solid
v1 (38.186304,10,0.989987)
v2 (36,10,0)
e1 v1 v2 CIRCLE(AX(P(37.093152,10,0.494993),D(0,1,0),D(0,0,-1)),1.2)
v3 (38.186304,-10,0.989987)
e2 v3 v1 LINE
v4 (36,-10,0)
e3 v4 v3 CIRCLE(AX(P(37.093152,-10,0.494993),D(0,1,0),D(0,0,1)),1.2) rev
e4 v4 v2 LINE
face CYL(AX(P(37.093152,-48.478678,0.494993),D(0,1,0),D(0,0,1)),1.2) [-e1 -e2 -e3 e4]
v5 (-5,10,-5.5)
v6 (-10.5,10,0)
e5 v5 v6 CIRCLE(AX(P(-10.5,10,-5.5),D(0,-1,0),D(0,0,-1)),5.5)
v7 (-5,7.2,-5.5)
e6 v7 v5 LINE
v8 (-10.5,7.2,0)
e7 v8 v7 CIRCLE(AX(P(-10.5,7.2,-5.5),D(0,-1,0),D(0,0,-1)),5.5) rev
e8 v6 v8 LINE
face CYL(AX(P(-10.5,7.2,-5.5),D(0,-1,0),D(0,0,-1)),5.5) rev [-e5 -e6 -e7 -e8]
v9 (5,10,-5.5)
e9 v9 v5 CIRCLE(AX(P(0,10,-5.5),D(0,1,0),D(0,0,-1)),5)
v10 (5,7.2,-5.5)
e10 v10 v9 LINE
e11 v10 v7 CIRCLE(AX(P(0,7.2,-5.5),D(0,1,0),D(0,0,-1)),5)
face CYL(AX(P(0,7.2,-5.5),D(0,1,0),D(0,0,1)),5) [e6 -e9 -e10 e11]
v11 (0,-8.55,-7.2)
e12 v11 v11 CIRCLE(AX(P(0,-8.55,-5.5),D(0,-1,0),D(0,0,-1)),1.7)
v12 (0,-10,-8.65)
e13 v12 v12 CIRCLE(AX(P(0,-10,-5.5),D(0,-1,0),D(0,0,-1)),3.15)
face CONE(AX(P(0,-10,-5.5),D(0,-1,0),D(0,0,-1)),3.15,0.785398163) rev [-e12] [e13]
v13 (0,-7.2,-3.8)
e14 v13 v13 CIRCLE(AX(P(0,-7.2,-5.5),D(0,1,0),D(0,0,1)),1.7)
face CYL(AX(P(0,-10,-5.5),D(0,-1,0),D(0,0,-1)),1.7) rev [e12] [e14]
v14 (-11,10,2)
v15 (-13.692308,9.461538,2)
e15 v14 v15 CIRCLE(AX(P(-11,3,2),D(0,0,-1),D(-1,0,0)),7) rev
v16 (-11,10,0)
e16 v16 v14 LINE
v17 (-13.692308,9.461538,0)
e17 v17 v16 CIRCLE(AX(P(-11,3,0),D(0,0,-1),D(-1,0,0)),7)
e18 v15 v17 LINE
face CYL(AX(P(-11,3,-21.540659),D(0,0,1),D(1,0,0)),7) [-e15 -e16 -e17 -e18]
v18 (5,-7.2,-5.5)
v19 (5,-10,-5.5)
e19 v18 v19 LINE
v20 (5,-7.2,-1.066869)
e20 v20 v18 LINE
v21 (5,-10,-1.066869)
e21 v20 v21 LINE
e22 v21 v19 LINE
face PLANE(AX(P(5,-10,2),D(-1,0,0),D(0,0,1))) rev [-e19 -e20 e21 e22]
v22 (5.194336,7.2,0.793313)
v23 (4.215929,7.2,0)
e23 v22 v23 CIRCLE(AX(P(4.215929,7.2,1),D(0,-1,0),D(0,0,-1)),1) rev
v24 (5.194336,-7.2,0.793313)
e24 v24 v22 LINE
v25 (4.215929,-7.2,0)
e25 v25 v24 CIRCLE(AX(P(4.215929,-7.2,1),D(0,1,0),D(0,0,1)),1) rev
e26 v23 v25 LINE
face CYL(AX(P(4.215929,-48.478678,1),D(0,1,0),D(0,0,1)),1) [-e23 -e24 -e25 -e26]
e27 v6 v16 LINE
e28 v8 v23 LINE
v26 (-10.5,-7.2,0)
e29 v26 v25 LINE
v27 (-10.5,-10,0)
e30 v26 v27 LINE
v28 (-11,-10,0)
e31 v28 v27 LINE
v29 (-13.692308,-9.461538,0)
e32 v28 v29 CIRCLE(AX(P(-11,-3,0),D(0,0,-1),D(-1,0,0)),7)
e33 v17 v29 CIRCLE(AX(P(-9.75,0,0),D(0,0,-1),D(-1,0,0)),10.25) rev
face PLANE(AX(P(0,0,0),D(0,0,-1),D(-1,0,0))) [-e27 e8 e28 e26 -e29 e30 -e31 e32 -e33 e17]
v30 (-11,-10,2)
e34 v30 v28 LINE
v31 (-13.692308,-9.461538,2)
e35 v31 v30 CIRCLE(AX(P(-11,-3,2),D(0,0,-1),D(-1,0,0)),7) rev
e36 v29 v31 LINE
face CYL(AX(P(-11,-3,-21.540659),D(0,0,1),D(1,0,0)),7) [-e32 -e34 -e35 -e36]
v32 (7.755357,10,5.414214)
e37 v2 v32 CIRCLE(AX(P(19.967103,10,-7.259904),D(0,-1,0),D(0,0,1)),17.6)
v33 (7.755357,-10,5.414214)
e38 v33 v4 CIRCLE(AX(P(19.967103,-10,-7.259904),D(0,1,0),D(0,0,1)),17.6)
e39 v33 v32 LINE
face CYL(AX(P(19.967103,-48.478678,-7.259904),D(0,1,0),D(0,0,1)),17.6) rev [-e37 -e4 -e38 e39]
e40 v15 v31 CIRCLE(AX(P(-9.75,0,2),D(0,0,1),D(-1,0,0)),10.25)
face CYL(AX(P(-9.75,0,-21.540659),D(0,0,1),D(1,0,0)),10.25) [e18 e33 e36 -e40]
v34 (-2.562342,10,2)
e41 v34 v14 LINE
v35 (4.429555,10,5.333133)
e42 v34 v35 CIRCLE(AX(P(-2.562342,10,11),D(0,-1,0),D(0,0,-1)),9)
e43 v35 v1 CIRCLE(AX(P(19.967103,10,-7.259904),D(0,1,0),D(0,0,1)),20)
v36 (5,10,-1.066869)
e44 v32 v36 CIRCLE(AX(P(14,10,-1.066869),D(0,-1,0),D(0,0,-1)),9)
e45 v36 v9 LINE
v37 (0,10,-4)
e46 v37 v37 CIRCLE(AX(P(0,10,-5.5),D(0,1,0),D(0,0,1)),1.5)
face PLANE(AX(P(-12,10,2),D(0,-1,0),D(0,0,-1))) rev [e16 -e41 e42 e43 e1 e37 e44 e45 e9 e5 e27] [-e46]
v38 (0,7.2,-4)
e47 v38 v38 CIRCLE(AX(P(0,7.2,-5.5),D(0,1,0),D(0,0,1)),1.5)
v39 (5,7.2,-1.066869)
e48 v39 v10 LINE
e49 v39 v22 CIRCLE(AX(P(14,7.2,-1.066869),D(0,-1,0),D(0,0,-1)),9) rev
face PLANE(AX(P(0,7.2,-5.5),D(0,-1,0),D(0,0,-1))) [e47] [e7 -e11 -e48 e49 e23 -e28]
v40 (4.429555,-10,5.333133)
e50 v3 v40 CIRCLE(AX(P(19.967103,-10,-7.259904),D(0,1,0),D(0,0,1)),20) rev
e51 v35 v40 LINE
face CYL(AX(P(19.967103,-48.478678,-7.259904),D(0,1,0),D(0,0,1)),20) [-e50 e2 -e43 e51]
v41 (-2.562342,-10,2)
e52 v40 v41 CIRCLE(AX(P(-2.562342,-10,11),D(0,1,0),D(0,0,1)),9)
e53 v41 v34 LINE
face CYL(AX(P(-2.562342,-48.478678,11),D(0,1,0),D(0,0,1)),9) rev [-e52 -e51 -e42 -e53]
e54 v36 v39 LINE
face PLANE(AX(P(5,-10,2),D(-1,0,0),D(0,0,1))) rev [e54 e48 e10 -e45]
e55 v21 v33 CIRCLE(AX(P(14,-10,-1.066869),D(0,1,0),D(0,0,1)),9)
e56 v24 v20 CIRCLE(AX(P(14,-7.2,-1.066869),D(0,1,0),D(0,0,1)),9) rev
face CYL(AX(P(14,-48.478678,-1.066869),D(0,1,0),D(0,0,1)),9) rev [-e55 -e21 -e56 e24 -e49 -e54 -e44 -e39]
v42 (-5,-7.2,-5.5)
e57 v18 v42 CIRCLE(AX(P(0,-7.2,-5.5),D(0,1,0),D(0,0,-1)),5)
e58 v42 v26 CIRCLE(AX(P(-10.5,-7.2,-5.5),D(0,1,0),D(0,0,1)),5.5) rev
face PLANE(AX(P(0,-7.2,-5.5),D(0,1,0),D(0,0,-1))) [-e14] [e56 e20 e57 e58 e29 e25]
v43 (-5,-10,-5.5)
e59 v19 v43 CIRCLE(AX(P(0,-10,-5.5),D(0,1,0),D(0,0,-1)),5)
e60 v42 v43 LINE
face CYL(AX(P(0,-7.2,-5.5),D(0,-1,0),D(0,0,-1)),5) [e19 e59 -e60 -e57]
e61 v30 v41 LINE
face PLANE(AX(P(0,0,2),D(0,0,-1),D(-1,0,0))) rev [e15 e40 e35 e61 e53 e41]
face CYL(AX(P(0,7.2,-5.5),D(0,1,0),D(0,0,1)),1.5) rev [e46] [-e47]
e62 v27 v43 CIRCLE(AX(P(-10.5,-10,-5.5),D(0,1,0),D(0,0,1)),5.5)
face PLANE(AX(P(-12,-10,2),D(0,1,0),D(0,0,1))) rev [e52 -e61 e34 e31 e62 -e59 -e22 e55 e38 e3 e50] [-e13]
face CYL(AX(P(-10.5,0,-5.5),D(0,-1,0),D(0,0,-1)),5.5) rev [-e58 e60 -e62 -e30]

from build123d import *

# Parameters (mm, degrees)
SKETCH1_W                                           = 17
SKETCH1_H                                           = 20
BOSS_EXTRUDE1_DEPTH                                 = 2
SKETCH2_R                                           = 1.5
BOSS_EXTRUDE2_DEPTH                                 = 2.8
FILLET1_R                                           = 5.5
FILLET1_OF_MIRROR1_R                                = 5.5
CSK_FOR_M3_COUNTERSUNK_FLAT_HEAD_SCREW1_D           = 3.4
CSK_FOR_M3_COUNTERSUNK_FLAT_HEAD_SCREW1_DEPTH       = 7
CSK_FOR_M3_COUNTERSUNK_FLAT_HEAD_SCREW1_CSINK_D     = 6.3
CSK_FOR_M3_COUNTERSUNK_FLAT_HEAD_SCREW1_CSINK_ANGLE = 90
CSK_FOR_M3_COUNTERSUNK_FLAT_HEAD_SCREW1_TIP         = 1.021463052
BOSS_EXTRUDE3_DEPTH                                 = 2
FILLET2_R                                           = 7
BOSS_EXTRUDE4_DEPTH                                 = 20
FILLET3_R                                           = 9
FILLET4_R                                           = 9
FILLET5_R                                           = 1


# Some blends are built 0.0001 mm under size
with BuildPart() as part:
    # Sketch1 → Boss-Extrude1 (new body)
    with BuildSketch(Plane.XY):
        with Locations((-3.5, 0)):
            Rectangle(SKETCH1_W, SKETCH1_H)
    extrude(amount=BOSS_EXTRUDE1_DEPTH)

    # Sketch2 → Boss-Extrude2 (add)
    with BuildSketch(Plane(origin=(0, 10, 0), x_dir=(1, 0, 0), z_dir=(0, 1, 0))):
        with BuildLine():
            Line((5, 0), (-5, 0))
            Line((-5, 0), (-5, 5.5))
            ThreePointArc((-5, 5.5), (0, 10.5), (5, 5.5))
            Line((5, 5.5), (5, 0))
        make_face()
        with Locations(Location((0, 5.5, 0), (0, 0, 270))):
            Circle(SKETCH2_R, mode=Mode.SUBTRACT)
    boss_extrude2 = extrude(amount=-BOSS_EXTRUDE2_DEPTH)

    # Fillet1
    fillet1_edges = [part.edges().sort_by_distance(p)[0] for p in [
        (-5, 8.6, 0),
    ]]
    fillet(fillet1_edges, radius=FILLET1_R - 0.0001)  # a hair under: the kernel refuses the full size

    # Mirror1: Boss-Extrude2 across plane
    add(boss_extrude2.mirror(Plane.ZX))

    # Fillet1 of Mirror1
    fillet1_of_mirror1_edges = [part.edges().sort_by_distance(p)[0] for p in [
        (-5, -8.6, 0),
    ]]
    fillet(fillet1_of_mirror1_edges, radius=FILLET1_OF_MIRROR1_R - 0.0001)  # a hair under: the kernel refuses the full size

    # CSK for M3 Countersunk Flat Head Screw1
    with Locations(Plane(origin=(0, -10, 0), x_dir=(-1, 0, 0), z_dir=(0, -1, 0))):
        with Locations((0, 5.5)):
            CounterSinkHole(CSK_FOR_M3_COUNTERSUNK_FLAT_HEAD_SCREW1_D / 2, CSK_FOR_M3_COUNTERSUNK_FLAT_HEAD_SCREW1_CSINK_D / 2, depth=CSK_FOR_M3_COUNTERSUNK_FLAT_HEAD_SCREW1_DEPTH, counter_sink_angle=CSK_FOR_M3_COUNTERSUNK_FLAT_HEAD_SCREW1_CSINK_ANGLE)
            with Locations((0, 0, -(CSK_FOR_M3_COUNTERSUNK_FLAT_HEAD_SCREW1_DEPTH + CSK_FOR_M3_COUNTERSUNK_FLAT_HEAD_SCREW1_TIP / 2))):  # 118° drill point
                Cone(0, CSK_FOR_M3_COUNTERSUNK_FLAT_HEAD_SCREW1_D / 2, CSK_FOR_M3_COUNTERSUNK_FLAT_HEAD_SCREW1_TIP, mode=Mode.SUBTRACT)

    # Sketch5 → Boss-Extrude3 (add)
    with BuildSketch(Plane.XY.offset(2)):
        with BuildLine():
            Line((-12, 10), (-12, -10))
            ThreePointArc((-12, -10), (-20, 0), (-12, 10))
        make_face()
    extrude(amount=-BOSS_EXTRUDE3_DEPTH)

    # Fillet2
    fillet2_edges = [part.edges().sort_by_distance(p)[0] for p in [
        (-12, -10, 1),
        (-12, 10, 1),
    ]]
    fillet(fillet2_edges, radius=FILLET2_R)

    # Sketch6 → Boss-Extrude4 (add)
    with BuildSketch(Plane(origin=(0, 10, 0), x_dir=(1, 0, 0), z_dir=(0, 1, 0))):
        with BuildLine():
            Line((2.239887411, -2), (4.367153275, -0.888811472))
            ThreePointArc((4.367153275, -0.888811472), (20.461428056, -10.333152259), (36, 0))
            ThreePointArc((36, 0), (37.588145554, 0.59815859), (38.186304144, -0.989986964))
            ThreePointArc((38.186304144, -0.989986964), (20.528836027, -12.73220544), (2.239887411, -2))
        make_face()
    extrude(amount=-BOSS_EXTRUDE4_DEPTH)

    # Fillet3
    # the kernel refuses this fillet: 9 mm, written as the material it adds along each edge
    with BuildSketch(Plane(origin=(5, -10, 2), x_dir=(0, 0, -1), z_dir=(0, 1, 0))) as fillet3_piece_1_section:
        with BuildLine():
            CenterArc((3.066869404, -9), FILLET3_R, 90, 46.064417531)
            ThreePointArc((-3.414213733, -2.755357386), (-1.793300325, -1.270874802), (0, 0))
            Line((0, 0), (3.066869404, 0))
        make_face()
    fillet3_piece_1 = extrude(amount=20, mode=Mode.PRIVATE)
    fillet3_piece_1 = split(fillet3_piece_1, bisect_by=Plane(origin=(4.921450274, -8.6, 0), z_dir=(0, 0, -1)), keep=Keep.TOP, mode=Mode.PRIVATE)
    fillet3_piece_1 = split(fillet3_piece_1, bisect_by=Plane(origin=(4.921450274, -7.2, -0.505403298), z_dir=(0, -1, 0)), keep=Keep.TOP, mode=Mode.PRIVATE)
    add(fillet3_piece_1)
    with BuildSketch(Plane(origin=(5, -10, 2), x_dir=(0, 0, -1), z_dir=(0, 1, 0))) as fillet3_piece_2_section:
        with BuildLine():
            CenterArc((3.066869404, -9), FILLET3_R, 90, 46.064417531)
            ThreePointArc((-3.414213733, -2.755357386), (-1.793300325, -1.270874802), (0, 0))
            Line((0, 0), (3.066869404, 0))
        make_face()
    fillet3_piece_2 = extrude(amount=20, mode=Mode.PRIVATE)
    fillet3_piece_2 = split(fillet3_piece_2, bisect_by=Plane(origin=(5.669505966, -8.6, 0), z_dir=(0, 0, 1)), keep=Keep.TOP, mode=Mode.PRIVATE)
    fillet3_piece_2 = split(fillet3_piece_2, bisect_by=Plane(origin=(5.669505966, -7.2, 2.571944176), z_dir=(0, -1, 0)), keep=Keep.TOP, mode=Mode.PRIVATE)
    add(fillet3_piece_2)
    with BuildSketch(Plane(origin=(5, -10, 2), x_dir=(0, 0, -1), z_dir=(0, 1, 0))) as fillet3_piece_3_section:
        with BuildLine():
            CenterArc((3.066869404, -9), FILLET3_R, 90, 46.064417531)
            ThreePointArc((-3.414213733, -2.755357386), (-1.793300325, -1.270874802), (0, 0))
            Line((0, 0), (3.066869404, 0))
        make_face()
    fillet3_piece_3 = extrude(amount=20, mode=Mode.PRIVATE)
    fillet3_piece_3 = split(fillet3_piece_3, bisect_by=Plane(origin=(5.669505966, 0, 0), z_dir=(0, 0, 1)), keep=Keep.TOP, mode=Mode.PRIVATE)
    fillet3_piece_3 = split(fillet3_piece_3, bisect_by=Plane(origin=(5.669505966, 7.2, 2.571944176), z_dir=(0, -1, 0)), keep=Keep.TOP, mode=Mode.PRIVATE)
    fillet3_piece_3 = split(fillet3_piece_3, bisect_by=Plane(origin=(5.669505966, -7.2, 2.571944176), z_dir=(0, 1, 0)), keep=Keep.TOP, mode=Mode.PRIVATE)
    add(fillet3_piece_3)
    with BuildSketch(Plane(origin=(5, -10, 2), x_dir=(0, 0, -1), z_dir=(0, 1, 0))) as fillet3_piece_4_section:
        with BuildLine():
            CenterArc((3.066869404, -9), FILLET3_R, 90, 46.064417531)
            ThreePointArc((-3.414213733, -2.755357386), (-1.793300325, -1.270874802), (0, 0))
            Line((0, 0), (3.066869404, 0))
        make_face()
    fillet3_piece_4 = extrude(amount=20, mode=Mode.PRIVATE)
    fillet3_piece_4 = split(fillet3_piece_4, bisect_by=Plane(origin=(4.921450274, 8.6, 0), z_dir=(0, 0, -1)), keep=Keep.TOP, mode=Mode.PRIVATE)
    fillet3_piece_4 = split(fillet3_piece_4, bisect_by=Plane(origin=(4.921450274, 7.2, -0.505403298), z_dir=(0, 1, 0)), keep=Keep.TOP, mode=Mode.PRIVATE)
    add(fillet3_piece_4)
    with BuildSketch(Plane(origin=(5, -10, 2), x_dir=(0, 0, -1), z_dir=(0, 1, 0))) as fillet3_piece_5_section:
        with BuildLine():
            CenterArc((3.066869404, -9), FILLET3_R, 90, 46.064417531)
            ThreePointArc((-3.414213733, -2.755357386), (-1.793300325, -1.270874802), (0, 0))
            Line((0, 0), (3.066869404, 0))
        make_face()
    fillet3_piece_5 = extrude(amount=20, mode=Mode.PRIVATE)
    fillet3_piece_5 = split(fillet3_piece_5, bisect_by=Plane(origin=(5.669505966, 8.6, 0), z_dir=(0, 0, 1)), keep=Keep.TOP, mode=Mode.PRIVATE)
    fillet3_piece_5 = split(fillet3_piece_5, bisect_by=Plane(origin=(5.669505966, 7.2, 2.571944176), z_dir=(0, 1, 0)), keep=Keep.TOP, mode=Mode.PRIVATE)
    add(fillet3_piece_5)

    # Fillet4
    fillet4_edges = [part.edges().sort_by_distance(p)[0] for p in [
        (2.239887411, 0, 2),
    ]]
    fillet(fillet4_edges, radius=FILLET4_R)

    # Fillet5
    fillet5_edges = [part.edges().sort_by_distance(p)[0] for p in [
        (5.063457622, 0, 0),
    ]]
    fillet(fillet5_edges, radius=FILLET5_R)


solid = part.part
